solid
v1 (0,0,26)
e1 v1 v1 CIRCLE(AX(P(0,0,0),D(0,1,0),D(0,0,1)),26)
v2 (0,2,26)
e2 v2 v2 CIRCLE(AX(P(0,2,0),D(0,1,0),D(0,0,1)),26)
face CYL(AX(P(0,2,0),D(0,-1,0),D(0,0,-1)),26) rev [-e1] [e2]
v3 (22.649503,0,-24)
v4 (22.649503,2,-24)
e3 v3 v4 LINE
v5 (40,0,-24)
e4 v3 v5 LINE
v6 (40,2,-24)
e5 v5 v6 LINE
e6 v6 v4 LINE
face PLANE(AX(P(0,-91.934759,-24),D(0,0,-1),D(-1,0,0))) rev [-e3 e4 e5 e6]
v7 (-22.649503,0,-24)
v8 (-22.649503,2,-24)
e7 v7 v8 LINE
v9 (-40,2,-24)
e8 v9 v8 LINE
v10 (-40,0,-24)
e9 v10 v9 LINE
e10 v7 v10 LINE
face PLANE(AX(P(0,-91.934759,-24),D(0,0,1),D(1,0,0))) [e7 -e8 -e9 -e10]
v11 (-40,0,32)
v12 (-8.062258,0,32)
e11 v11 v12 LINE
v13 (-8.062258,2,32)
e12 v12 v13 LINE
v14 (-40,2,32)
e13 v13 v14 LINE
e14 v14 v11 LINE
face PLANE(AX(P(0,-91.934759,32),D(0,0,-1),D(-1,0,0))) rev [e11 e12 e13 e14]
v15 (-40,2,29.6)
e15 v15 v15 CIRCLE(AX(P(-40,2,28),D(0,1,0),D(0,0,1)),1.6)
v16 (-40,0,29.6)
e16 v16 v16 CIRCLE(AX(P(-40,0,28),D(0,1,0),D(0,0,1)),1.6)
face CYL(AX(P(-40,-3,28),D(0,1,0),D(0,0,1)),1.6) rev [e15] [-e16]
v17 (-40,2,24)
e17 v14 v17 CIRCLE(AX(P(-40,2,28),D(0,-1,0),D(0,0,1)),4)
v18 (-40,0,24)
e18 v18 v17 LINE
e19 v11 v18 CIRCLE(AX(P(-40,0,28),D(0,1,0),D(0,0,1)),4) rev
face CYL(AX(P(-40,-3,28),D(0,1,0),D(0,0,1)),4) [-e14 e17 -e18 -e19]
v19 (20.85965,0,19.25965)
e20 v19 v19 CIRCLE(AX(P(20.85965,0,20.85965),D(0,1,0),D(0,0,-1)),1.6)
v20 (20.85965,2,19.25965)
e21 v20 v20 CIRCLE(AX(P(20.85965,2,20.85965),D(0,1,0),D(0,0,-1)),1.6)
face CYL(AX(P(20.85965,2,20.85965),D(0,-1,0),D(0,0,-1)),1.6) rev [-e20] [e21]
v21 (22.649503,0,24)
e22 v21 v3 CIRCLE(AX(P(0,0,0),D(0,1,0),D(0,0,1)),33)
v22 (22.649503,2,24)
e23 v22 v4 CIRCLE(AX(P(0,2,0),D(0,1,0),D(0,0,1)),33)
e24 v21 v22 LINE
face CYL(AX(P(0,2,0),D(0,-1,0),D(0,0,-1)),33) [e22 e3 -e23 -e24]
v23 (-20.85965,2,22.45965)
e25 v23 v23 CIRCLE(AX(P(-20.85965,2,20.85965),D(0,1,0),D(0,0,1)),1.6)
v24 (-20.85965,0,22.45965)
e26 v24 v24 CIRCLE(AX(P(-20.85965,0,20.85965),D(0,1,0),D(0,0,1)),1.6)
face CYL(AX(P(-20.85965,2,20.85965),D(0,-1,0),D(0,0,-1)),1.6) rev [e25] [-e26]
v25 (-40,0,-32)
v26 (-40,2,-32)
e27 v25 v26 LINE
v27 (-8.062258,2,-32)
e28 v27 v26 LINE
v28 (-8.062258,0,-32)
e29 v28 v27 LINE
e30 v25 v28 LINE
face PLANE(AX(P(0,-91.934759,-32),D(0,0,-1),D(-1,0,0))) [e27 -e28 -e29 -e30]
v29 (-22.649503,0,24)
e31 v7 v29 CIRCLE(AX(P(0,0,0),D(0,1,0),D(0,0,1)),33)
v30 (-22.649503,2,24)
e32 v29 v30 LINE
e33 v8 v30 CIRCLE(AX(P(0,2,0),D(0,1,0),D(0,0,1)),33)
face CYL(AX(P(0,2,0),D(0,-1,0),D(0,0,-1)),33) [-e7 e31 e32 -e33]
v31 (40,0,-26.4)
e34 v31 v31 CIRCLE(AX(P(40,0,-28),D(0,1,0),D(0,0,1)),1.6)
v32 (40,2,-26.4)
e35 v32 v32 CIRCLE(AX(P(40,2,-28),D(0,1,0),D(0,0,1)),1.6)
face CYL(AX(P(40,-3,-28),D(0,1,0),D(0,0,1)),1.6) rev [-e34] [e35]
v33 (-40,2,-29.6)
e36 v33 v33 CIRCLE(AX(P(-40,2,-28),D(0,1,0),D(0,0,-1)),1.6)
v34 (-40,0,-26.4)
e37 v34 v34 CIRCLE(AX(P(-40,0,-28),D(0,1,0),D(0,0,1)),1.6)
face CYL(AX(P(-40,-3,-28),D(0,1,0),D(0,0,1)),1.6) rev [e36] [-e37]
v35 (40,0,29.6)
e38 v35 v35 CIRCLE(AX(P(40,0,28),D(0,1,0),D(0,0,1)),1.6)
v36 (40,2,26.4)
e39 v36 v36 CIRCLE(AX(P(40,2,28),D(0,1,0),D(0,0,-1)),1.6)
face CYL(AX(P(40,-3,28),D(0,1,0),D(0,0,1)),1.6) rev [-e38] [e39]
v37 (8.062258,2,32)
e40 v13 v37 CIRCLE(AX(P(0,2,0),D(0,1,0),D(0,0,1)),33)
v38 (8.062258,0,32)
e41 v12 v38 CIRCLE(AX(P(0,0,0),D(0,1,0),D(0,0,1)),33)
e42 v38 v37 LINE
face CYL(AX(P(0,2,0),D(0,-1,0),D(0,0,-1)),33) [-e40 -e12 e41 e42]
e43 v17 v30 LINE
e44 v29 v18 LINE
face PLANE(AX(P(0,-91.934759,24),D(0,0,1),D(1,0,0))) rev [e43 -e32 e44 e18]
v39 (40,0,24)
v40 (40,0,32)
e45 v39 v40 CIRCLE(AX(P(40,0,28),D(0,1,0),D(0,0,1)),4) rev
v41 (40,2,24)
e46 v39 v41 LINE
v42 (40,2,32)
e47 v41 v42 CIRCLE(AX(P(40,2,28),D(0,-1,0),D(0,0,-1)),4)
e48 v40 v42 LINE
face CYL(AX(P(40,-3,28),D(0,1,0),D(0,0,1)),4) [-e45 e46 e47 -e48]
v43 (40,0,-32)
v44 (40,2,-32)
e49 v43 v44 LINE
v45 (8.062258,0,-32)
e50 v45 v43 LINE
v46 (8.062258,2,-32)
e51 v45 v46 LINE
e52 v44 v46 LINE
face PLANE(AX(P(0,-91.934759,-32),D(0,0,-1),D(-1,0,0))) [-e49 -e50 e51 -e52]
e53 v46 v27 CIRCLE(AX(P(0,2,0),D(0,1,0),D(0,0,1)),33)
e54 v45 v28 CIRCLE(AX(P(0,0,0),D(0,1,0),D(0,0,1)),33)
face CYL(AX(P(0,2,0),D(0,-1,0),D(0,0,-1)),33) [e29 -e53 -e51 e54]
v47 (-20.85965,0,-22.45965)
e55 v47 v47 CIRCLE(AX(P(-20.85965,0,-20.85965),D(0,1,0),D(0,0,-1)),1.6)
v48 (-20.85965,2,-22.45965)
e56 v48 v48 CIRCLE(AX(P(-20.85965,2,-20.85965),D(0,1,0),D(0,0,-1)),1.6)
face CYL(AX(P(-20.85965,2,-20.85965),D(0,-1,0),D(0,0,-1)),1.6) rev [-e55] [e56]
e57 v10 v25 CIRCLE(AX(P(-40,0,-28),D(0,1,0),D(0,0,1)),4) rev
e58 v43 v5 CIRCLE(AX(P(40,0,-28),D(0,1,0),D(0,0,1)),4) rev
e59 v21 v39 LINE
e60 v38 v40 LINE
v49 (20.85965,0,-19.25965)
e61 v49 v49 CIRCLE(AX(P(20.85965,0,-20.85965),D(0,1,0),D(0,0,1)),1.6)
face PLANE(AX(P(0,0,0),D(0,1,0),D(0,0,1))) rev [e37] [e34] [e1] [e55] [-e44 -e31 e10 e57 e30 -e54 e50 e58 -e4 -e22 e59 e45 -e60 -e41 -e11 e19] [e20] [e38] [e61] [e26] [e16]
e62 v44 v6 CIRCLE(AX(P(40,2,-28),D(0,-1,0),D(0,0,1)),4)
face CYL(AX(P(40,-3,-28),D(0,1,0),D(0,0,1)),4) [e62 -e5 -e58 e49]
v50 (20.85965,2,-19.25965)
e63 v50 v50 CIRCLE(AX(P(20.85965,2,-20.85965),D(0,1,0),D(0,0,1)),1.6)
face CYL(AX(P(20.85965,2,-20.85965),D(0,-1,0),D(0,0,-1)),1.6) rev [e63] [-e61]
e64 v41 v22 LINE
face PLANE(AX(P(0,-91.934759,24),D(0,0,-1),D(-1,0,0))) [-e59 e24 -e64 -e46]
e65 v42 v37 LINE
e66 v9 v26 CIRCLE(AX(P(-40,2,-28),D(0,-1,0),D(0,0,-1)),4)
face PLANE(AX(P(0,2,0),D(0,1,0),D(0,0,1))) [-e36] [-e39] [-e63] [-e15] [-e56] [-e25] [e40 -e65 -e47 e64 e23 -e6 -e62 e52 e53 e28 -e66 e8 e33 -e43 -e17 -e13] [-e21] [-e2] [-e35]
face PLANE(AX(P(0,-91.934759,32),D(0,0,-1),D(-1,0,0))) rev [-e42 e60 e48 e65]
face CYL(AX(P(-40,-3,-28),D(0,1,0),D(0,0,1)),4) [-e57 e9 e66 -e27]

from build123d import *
from build123d.topology import SkipClean

# Parameters (mm, degrees)
SKETCH1_R           = 1.6
BOSS_EXTRUDE1_DEPTH = 2
SKETCH2_R           = 48
SKETCH2_R_2         = 42
SKETCH2_R_3         = 1.6
BOSS_EXTRUDE2_DEPTH = 2
SKETCH3_R           = 1.6
BOSS_EXTRUDE3_DEPTH = 2
CUT_EXTRUDE1_DEPTH  = 10
FILLET1_R           = 3
BOSS_EXTRUDE4_DEPTH = 2
CUT_EXTRUDE2_START  = -10
SKETCH6_R           = 26
CUT_EXTRUDE2_DEPTH  = 10
CUT_EXTRUDE3_START  = -10
SKETCH7_R           = 112.740823419
SKETCH7_R_2         = 33
CUT_EXTRUDE3_DEPTH  = 10
BOSS_EXTRUDE5_START = -2
SKETCH8_R           = 1.6
SKETCH8_R_2         = 26
BOSS_EXTRUDE5_DEPTH = 2
SKETCH9_R           = 1.6
CUT_EXTRUDE4_DEPTH  = 5


with BuildPart() as part:
    # Sketch1 → Boss-Extrude1 (new body)
    with BuildSketch(Plane(origin=(0, 0, 0), x_dir=(1, 0, 0), z_dir=(0, 1, 0))):
        with BuildLine():
            Line((-51.943772875, 37.828427125), (-29.299283734, 15.183937983))
            ThreePointArc((-29.299283734, 15.183937983), (0, 33), (29.299283734, 15.183937983))
            Line((29.299283734, 15.183937983), (51.943772875, 37.828427125))
            ThreePointArc((51.943772875, 37.828427125), (57.600627125, 37.828427125), (57.600627125, 32.171572875))
            Line((57.600627125, 32.171572875), (32.280845123, 6.851790873))
            ThreePointArc((32.280845123, 6.851790873), (33, 0), (32.280845123, -6.851790873))
            Line((32.280845123, -6.851790873), (57.600627125, -32.171572875))
            ThreePointArc((57.600627125, -32.171572875), (57.600627125, -37.828427125), (51.943772875, -37.828427125))
            Line((51.943772875, -37.828427125), (29.299283734, -15.183937983))
            ThreePointArc((29.299283734, -15.183937983), (0, -33), (-29.299283734, -15.183937983))
            Line((-29.299283734, -15.183937983), (-51.943772875, -37.828427125))
            ThreePointArc((-51.943772875, -37.828427125), (-57.600627125, -37.828427125), (-57.600627125, -32.171572875))
            Line((-57.600627125, -32.171572875), (-32.280845123, -6.851790873))
            ThreePointArc((-32.280845123, -6.851790873), (-33, 0), (-32.280845123, 6.851790873))
            Line((-32.280845123, 6.851790873), (-57.600627125, 32.171572875))
            ThreePointArc((-57.600627125, 32.171572875), (-57.600627125, 37.828427125), (-51.943772875, 37.828427125))
        make_face()
        with Locations(Location((54.7722, 35, 0), (0, 0, 270))):
            Circle(SKETCH1_R, mode=Mode.SUBTRACT)
        with Locations(Location((-54.7722, 35, 0), (0, 0, 90))):
            Circle(SKETCH1_R, mode=Mode.SUBTRACT)
        with Locations(Location((54.7722, -35, 0), (0, 0, 90))):
            Circle(SKETCH1_R, mode=Mode.SUBTRACT)
        with Locations(Location((-54.7722, -35, 0), (0, 0, 270))):
            Circle(SKETCH1_R, mode=Mode.SUBTRACT)
        with Locations(Location((20.859650045, 20.859650045, 0), (0, 0, 270))):
            Circle(SKETCH1_R, mode=Mode.SUBTRACT)
        with Locations(Location((-20.859650045, 20.859650045, 0), (0, 0, 90))):
            Circle(SKETCH1_R, mode=Mode.SUBTRACT)
        with Locations(Location((20.859650045, -20.859650045, 0), (0, 0, 90))):
            Circle(SKETCH1_R, mode=Mode.SUBTRACT)
        with Locations(Location((-20.859650045, -20.859650045, 0), (0, 0, 270))):
            Circle(SKETCH1_R, mode=Mode.SUBTRACT)
        with BuildLine():
            Line((0, 4.242640687), (-16.140662024, 20.383302711))
            ThreePointArc((-16.140662024, 20.383302711), (0, 26), (16.140662024, 20.383302711))
            Line((16.140662024, 20.383302711), (0, 4.242640687))
        make_face(mode=Mode.SUBTRACT)
        with BuildLine():
            Line((0, -4.242640687), (-16.140662024, -20.383302711))
            ThreePointArc((-16.140662024, -20.383302711), (0, -26), (16.140662024, -20.383302711))
            Line((16.140662024, -20.383302711), (0, -4.242640687))
        make_face(mode=Mode.SUBTRACT)
        with BuildLine():
            Line((4.242640687, 0), (20.383302711, -16.140662024))
            ThreePointArc((20.383302711, -16.140662024), (26, 0), (20.383302711, 16.140662024))
            Line((20.383302711, 16.140662024), (4.242640687, 0))
        make_face(mode=Mode.SUBTRACT)
        with BuildLine():
            Line((-4.242640687, 0), (-20.383302711, -16.140662024))
            ThreePointArc((-20.383302711, -16.140662024), (-26, 0), (-20.383302711, 16.140662024))
            Line((-20.383302711, 16.140662024), (-4.242640687, 0))
        make_face(mode=Mode.SUBTRACT)
    extrude(amount=BOSS_EXTRUDE1_DEPTH)

    # Sketch2 → Boss-Extrude2 (add)
    with BuildSketch(Plane(origin=(0, 2, 0), x_dir=(1, 0, 0), z_dir=(0, 1, 0))):
        Circle(SKETCH2_R)
        Circle(SKETCH2_R_2, mode=Mode.SUBTRACT)
        with Locations(Location((31.819805153, 31.819805153, 0), (0, 0, 270))):
            Circle(SKETCH2_R_3, mode=Mode.SUBTRACT)
        with Locations(Location((-31.819805153, 31.819805153, 0), (0, 0, 270))):
            Circle(SKETCH2_R_3, mode=Mode.SUBTRACT)
        with Locations(Location((31.819805153, -31.819805153, 0), (0, 0, 270))):
            Circle(SKETCH2_R_3, mode=Mode.SUBTRACT)
        with Locations(Location((-31.819805153, -31.819805153, 0), (0, 0, 270))):
            Circle(SKETCH2_R_3, mode=Mode.SUBTRACT)
    extrude(amount=-BOSS_EXTRUDE2_DEPTH)

    # Sketch3 → Boss-Extrude3 (add)
    # profile 1 of 2: a face of its own
    with BuildSketch(Plane(origin=(0, 2, 0), x_dir=(1, 0, 0), z_dir=(0, 1, 0))):
        with BuildLine():
            Line((34.819811892, 31.819805153), (34.819811892, -31.819805153))
            ThreePointArc((34.819811892, -31.819805153), (31.819805153, -34.819811892), (28.819798415, -31.819805153))
            Line((28.819798415, -31.819805153), (28.819798415, 31.819805153))
            ThreePointArc((28.819798415, 31.819805153), (31.819805153, 34.819811892), (34.819811892, 31.819805153))
        make_face()
        with Locations(Location((31.819805153, -31.819805153, 0), (0, 0, 270))):
            Circle(SKETCH3_R, mode=Mode.SUBTRACT)
        with Locations(Location((31.819805153, 31.819805153, 0), (0, 0, 270))):
            Circle(SKETCH3_R, mode=Mode.SUBTRACT)
    # profile 2 of 2: a face of its own
    with BuildSketch(Plane(origin=(0, 2, 0), x_dir=(1, 0, 0), z_dir=(0, 1, 0))):
        with BuildLine():
            Line((-28.819798415, -31.819805153), (-28.819798415, 31.819805153))
            ThreePointArc((-28.819798415, 31.819805153), (-31.819805153, 34.819811892), (-34.819811892, 31.819805153))
            Line((-34.819811892, 31.819805153), (-34.819811892, -31.819805153))
            ThreePointArc((-34.819811892, -31.819805153), (-31.819805153, -34.819811892), (-28.819798415, -31.819805153))
        make_face()
        with Locations(Location((-31.819805153, 31.819805153, 0), (0, 0, 270))):
            Circle(SKETCH3_R, mode=Mode.SUBTRACT)
        with Locations(Location((-31.819805153, -31.819805153, 0), (0, 0, 270))):
            Circle(SKETCH3_R, mode=Mode.SUBTRACT)
    extrude(amount=-BOSS_EXTRUDE3_DEPTH)

    # Sketch4 → Cut-Extrude1 (cut)
    with BuildSketch(Plane(origin=(0, 2, 0), x_dir=(1, 0, 0), z_dir=(0, 1, 0))):
        Polygon((-28.819805153, 31.819805153), (-28.819805153, 24.740165209), (0, 38.846192425), (28.819805153, 24.740165209), (28.819805153, 31.819805153), (28.819805153, 53.488724091), (-28.819805153, 53.488724091), align=None)
        Polygon((28.819805153, -31.819805153), (28.819805153, -27.443703625), (0, -37.592318486), (-28.819805153, -27.443703625), (-28.819805153, -31.819805153), (-28.819805153, -57.678243433), (28.819805153, -57.678243433), align=None)
    extrude(amount=-CUT_EXTRUDE1_DEPTH, mode=Mode.SUBTRACT)

    # Fillet1
    # the kernel refuses this fillet: 3 mm, written as the material it takes off along each edge
    with BuildSketch(Plane(origin=(-28.819805153, -16.95161691, -38.385138152), x_dir=(0, 0, 1), z_dir=(0, 1, 0)), Plane(origin=(28.819805153, -16.95161691, 38.385138152), x_dir=(0, 0, -1), z_dir=(0, 1, 0))) as fillet1_piece_1:
        with BuildLine():
            CenterArc((6.565332998, -3), FILLET1_R, 90, 135)
            ThreePointArc((4.444012655, -5.121320344), (2.131461319, -2.639230371), (0, 0))
            Line((0, 0), (6.565332998, 0))
        make_face()
    extrude(amount=35.903233819, mode=Mode.SUBTRACT)
    with BuildSketch(Plane(origin=(-28.819805153, -16.95161691, 38.385138152), x_dir=(-0.755284934005079, 0, -0.6553965734308833), z_dir=(0, 1, 0)), Plane(origin=(28.819805153, -16.95161691, -38.385138152), x_dir=(0.7552849340050823, 0, 0.6553965734308795), z_dir=(0, 1, 0))) as fillet1_piece_2:
        with BuildLine():
            CenterArc((6.568751552, -2.99250738), FILLET1_R, 85.949727095, 135)
            Line((4.30289675, -4.9586971), (0, 0))
            ThreePointArc((0, 0), (3.390323382, 0.11988192), (6.780646764, 0))
        make_face()
    extrude(amount=35.903233819, mode=Mode.SUBTRACT)


with BuildPart() as boss_extrude4_tool:
    # Sketch5 → Boss-Extrude4 (new body)
    with BuildSketch(Plane(origin=(0, 2, 0), x_dir=(1, 0, 0), z_dir=(0, 1, 0))):
        Polygon((-31.819798415, 34.819811892), (31.819798415, 34.819811892), (29.753362448, 32.753375926), (28.819798415, 31.819811892), (28.819798415, 28.819811892), (0, 28.819811892), (-28.819798415, 28.819811892), (-28.819798415, 31.819811892), align=None)
        Polygon((-28.819798415, -31.819811892), (-31.819798415, -34.819811892), (31.819798415, -34.819811892), (29.753362448, -32.753375926), (28.819798415, -31.819811892), (28.819798415, -28.819811892), (0, -28.819811892), (-28.819798415, -28.819811892), align=None)
    extrude(amount=-BOSS_EXTRUDE4_DEPTH)


with BuildPart() as part_1:
    add(part.part)


with BuildPart() as part_2:
    # Boss-Extrude4: joined with boss_extrude4_tool
    add(part_1.part.fuse(boss_extrude4_tool.part, tol=0.00001))

    # Sketch6 → Cut-Extrude2 (cut)
    with BuildSketch(Plane(origin=(0, 2, 0), x_dir=(1, 0, 0), z_dir=(0, 1, 0)).offset(CUT_EXTRUDE2_START)):
        with Locations(Location((0, 0, 0), (0, 0, 270))):
            Circle(SKETCH6_R)
    extrude(amount=CUT_EXTRUDE2_DEPTH, mode=Mode.SUBTRACT)

    # Sketch7 → Cut-Extrude3 (cut)
    with SkipClean():  # the faces are left unmerged after this step: merging them gives an invalid solid
        with BuildSketch(Plane(origin=(0, 2, 0), x_dir=(1, 0, 0), z_dir=(0, 1, 0)).offset(CUT_EXTRUDE3_START)):
            Circle(SKETCH7_R)
            with Locations(Location((0, 0, 0), (0, 0, 270))):
                Circle(SKETCH7_R_2, mode=Mode.SUBTRACT)
        extrude(amount=CUT_EXTRUDE3_DEPTH, mode=Mode.SUBTRACT)

    # Sketch8 → Boss-Extrude5 (add)
    # profile 1 of 5: a face of its own
    with SkipClean():  # the faces are left unmerged after this step: merging them gives an invalid solid
        with BuildSketch(Plane(origin=(0, 2, 0), x_dir=(1, 0, 0), z_dir=(0, 1, 0)).offset(BOSS_EXTRUDE5_START)):
            with BuildLine():
                ThreePointArc((60, 24), (64, 28), (60, 32))
                Line((60, 32), (8.062257748, 32))
                ThreePointArc((8.062257748, 32), (15.86830384, 28.934355587), (22.649503306, 24))
                Line((22.649503306, 24), (60, 24))
            make_face()
            with Locations(Location((60, 28, 0), (0, 0, 270))):
                Circle(SKETCH8_R, mode=Mode.SUBTRACT)
        # profile 2 of 5: a face of its own
        with BuildSketch(Plane(origin=(0, 2, 0), x_dir=(1, 0, 0), z_dir=(0, 1, 0)).offset(BOSS_EXTRUDE5_START)):
            with BuildLine():
                ThreePointArc((-22.649503306, 24), (-15.86830384, 28.934355587), (-8.062257748, 32))
                Line((-8.062257748, 32), (-60, 32))
                ThreePointArc((-60, 32), (-64, 28), (-60, 24))
                Line((-60, 24), (-22.649503306, 24))
            make_face()
            with Locations(Location((-60, 28, 0), (0, 0, 270))):
                Circle(SKETCH8_R, mode=Mode.SUBTRACT)
        # profile 3 of 5: a face of its own
        with BuildSketch(Plane(origin=(0, 2, 0), x_dir=(1, 0, 0), z_dir=(0, 1, 0)).offset(BOSS_EXTRUDE5_START)):
            with BuildLine():
                ThreePointArc((-8.062257748, -32), (-15.86830384, -28.934355587), (-22.649503306, -24))
                Line((-22.649503306, -24), (-60, -24))
                ThreePointArc((-60, -24), (-64, -28), (-60, -32))
                Line((-60, -32), (-8.062257748, -32))
            make_face()
            with Locations(Location((-60, -28, 0), (0, 0, 270))):
                Circle(SKETCH8_R, mode=Mode.SUBTRACT)
        # profile 4 of 5: a face of its own
        with BuildSketch(Plane(origin=(0, 2, 0), x_dir=(1, 0, 0), z_dir=(0, 1, 0)).offset(BOSS_EXTRUDE5_START)):
            with BuildLine():
                Line((60, -24), (22.649503306, -24))
                ThreePointArc((22.649503306, -24), (15.86830384, -28.934355587), (8.062257748, -32))
                Line((8.062257748, -32), (60, -32))
                ThreePointArc((60, -32), (64, -28), (60, -24))
            make_face()
            with Locations(Location((60, -28, 0), (0, 0, 270))):
                Circle(SKETCH8_R, mode=Mode.SUBTRACT)
        # profile 5 of 5: a face of its own
        with BuildSketch(Plane(origin=(0, 2, 0), x_dir=(1, 0, 0), z_dir=(0, 1, 0)).offset(BOSS_EXTRUDE5_START)):
            with BuildLine():
                Line((22.649503306, 24), (0, 32))
                Line((0, 32), (-22.649503306, 24))
                ThreePointArc((-22.649503306, 24), (-33, 0), (-22.649503306, -24))
                Line((-22.649503306, -24), (0, -32))
                Line((0, -32), (22.649503306, -24))
                ThreePointArc((22.649503306, -24), (30.302092412, -13.068404472), (33, 0))
                ThreePointArc((33, 0), (30.302092412, 13.068404472), (22.649503306, 24))
            make_face()
            with Locations(Location((-20.859650045, -20.859650045, 0), (0, 0, 270))):
                Circle(SKETCH8_R, mode=Mode.SUBTRACT)
            with Locations(Location((20.859650045, -20.859650045, 0), (0, 0, 90))):
                Circle(SKETCH8_R, mode=Mode.SUBTRACT)
            with Locations(Location((-20.859650045, 20.859650045, 0), (0, 0, 90))):
                Circle(SKETCH8_R, mode=Mode.SUBTRACT)
            with Locations(Location((0, 0, 0), (0, 0, 270))):
                Circle(SKETCH8_R_2, mode=Mode.SUBTRACT)
            with Locations(Location((20.859650045, 20.859650045, 0), (0, 0, 270))):
                Circle(SKETCH8_R, mode=Mode.SUBTRACT)
        extrude(amount=BOSS_EXTRUDE5_DEPTH)

    # Sketch9 → Cut-Extrude4 (cut)
    with SkipClean():  # the faces are left unmerged after this step: merging them gives an invalid solid
        with BuildSketch(Plane(origin=(0, 2, 0), x_dir=(1, 0, 0), z_dir=(0, 1, 0))):
            with Locations(Location((40, 28, 0), (0, 0, 270))):
                Circle(SKETCH9_R)
            with Locations(Location((-40, 28, 0), (0, 0, 270))):
                Circle(SKETCH9_R)
            with Locations(Location((-40, -28, 0), (0, 0, 270))):
                Circle(SKETCH9_R)
            with Locations(Location((40, -28, 0), (0, 0, 270))):
                Circle(SKETCH9_R)
            with BuildLine():
                Line((-40, 32), (-88.801231513, 51.827440304))
                Line((-88.801231513, 51.827440304), (-77.903174013, 7.237500813))
                Line((-77.903174013, 7.237500813), (-40, 24))
                ThreePointArc((-40, 24), (-44, 28), (-40, 32))
            make_face()
            with BuildLine():
                Line((-40, -24), (-110.099658322, -14.969056523))
                Line((-110.099658322, -14.969056523), (-87.813441409, -65.362398728))
                Line((-87.813441409, -65.362398728), (-40, -32))
                ThreePointArc((-40, -32), (-44, -28), (-40, -24))
            make_face()
            with BuildLine():
                Line((40, -32), (82.780855651, -58.25577253))
                Line((82.780855651, -58.25577253), (126.86328335, 11.448571628))
                Line((126.86328335, 11.448571628), (40, -24))
                ThreePointArc((40, -24), (44, -28), (40, -32))
            make_face()
            with BuildLine():
                Line((40, 24), (64.956913766, 7.237500813))
                Line((64.956913766, 7.237500813), (132.433265189, 44.868462663))
                Line((132.433265189, 44.868462663), (31.218738054, 101.841419761))
                Line((31.218738054, 101.841419761), (40, 32))
                ThreePointArc((40, 32), (44, 28), (40, 24))
            make_face()
        extrude(amount=-CUT_EXTRUDE4_DEPTH, mode=Mode.SUBTRACT)


solid = part_2.part
